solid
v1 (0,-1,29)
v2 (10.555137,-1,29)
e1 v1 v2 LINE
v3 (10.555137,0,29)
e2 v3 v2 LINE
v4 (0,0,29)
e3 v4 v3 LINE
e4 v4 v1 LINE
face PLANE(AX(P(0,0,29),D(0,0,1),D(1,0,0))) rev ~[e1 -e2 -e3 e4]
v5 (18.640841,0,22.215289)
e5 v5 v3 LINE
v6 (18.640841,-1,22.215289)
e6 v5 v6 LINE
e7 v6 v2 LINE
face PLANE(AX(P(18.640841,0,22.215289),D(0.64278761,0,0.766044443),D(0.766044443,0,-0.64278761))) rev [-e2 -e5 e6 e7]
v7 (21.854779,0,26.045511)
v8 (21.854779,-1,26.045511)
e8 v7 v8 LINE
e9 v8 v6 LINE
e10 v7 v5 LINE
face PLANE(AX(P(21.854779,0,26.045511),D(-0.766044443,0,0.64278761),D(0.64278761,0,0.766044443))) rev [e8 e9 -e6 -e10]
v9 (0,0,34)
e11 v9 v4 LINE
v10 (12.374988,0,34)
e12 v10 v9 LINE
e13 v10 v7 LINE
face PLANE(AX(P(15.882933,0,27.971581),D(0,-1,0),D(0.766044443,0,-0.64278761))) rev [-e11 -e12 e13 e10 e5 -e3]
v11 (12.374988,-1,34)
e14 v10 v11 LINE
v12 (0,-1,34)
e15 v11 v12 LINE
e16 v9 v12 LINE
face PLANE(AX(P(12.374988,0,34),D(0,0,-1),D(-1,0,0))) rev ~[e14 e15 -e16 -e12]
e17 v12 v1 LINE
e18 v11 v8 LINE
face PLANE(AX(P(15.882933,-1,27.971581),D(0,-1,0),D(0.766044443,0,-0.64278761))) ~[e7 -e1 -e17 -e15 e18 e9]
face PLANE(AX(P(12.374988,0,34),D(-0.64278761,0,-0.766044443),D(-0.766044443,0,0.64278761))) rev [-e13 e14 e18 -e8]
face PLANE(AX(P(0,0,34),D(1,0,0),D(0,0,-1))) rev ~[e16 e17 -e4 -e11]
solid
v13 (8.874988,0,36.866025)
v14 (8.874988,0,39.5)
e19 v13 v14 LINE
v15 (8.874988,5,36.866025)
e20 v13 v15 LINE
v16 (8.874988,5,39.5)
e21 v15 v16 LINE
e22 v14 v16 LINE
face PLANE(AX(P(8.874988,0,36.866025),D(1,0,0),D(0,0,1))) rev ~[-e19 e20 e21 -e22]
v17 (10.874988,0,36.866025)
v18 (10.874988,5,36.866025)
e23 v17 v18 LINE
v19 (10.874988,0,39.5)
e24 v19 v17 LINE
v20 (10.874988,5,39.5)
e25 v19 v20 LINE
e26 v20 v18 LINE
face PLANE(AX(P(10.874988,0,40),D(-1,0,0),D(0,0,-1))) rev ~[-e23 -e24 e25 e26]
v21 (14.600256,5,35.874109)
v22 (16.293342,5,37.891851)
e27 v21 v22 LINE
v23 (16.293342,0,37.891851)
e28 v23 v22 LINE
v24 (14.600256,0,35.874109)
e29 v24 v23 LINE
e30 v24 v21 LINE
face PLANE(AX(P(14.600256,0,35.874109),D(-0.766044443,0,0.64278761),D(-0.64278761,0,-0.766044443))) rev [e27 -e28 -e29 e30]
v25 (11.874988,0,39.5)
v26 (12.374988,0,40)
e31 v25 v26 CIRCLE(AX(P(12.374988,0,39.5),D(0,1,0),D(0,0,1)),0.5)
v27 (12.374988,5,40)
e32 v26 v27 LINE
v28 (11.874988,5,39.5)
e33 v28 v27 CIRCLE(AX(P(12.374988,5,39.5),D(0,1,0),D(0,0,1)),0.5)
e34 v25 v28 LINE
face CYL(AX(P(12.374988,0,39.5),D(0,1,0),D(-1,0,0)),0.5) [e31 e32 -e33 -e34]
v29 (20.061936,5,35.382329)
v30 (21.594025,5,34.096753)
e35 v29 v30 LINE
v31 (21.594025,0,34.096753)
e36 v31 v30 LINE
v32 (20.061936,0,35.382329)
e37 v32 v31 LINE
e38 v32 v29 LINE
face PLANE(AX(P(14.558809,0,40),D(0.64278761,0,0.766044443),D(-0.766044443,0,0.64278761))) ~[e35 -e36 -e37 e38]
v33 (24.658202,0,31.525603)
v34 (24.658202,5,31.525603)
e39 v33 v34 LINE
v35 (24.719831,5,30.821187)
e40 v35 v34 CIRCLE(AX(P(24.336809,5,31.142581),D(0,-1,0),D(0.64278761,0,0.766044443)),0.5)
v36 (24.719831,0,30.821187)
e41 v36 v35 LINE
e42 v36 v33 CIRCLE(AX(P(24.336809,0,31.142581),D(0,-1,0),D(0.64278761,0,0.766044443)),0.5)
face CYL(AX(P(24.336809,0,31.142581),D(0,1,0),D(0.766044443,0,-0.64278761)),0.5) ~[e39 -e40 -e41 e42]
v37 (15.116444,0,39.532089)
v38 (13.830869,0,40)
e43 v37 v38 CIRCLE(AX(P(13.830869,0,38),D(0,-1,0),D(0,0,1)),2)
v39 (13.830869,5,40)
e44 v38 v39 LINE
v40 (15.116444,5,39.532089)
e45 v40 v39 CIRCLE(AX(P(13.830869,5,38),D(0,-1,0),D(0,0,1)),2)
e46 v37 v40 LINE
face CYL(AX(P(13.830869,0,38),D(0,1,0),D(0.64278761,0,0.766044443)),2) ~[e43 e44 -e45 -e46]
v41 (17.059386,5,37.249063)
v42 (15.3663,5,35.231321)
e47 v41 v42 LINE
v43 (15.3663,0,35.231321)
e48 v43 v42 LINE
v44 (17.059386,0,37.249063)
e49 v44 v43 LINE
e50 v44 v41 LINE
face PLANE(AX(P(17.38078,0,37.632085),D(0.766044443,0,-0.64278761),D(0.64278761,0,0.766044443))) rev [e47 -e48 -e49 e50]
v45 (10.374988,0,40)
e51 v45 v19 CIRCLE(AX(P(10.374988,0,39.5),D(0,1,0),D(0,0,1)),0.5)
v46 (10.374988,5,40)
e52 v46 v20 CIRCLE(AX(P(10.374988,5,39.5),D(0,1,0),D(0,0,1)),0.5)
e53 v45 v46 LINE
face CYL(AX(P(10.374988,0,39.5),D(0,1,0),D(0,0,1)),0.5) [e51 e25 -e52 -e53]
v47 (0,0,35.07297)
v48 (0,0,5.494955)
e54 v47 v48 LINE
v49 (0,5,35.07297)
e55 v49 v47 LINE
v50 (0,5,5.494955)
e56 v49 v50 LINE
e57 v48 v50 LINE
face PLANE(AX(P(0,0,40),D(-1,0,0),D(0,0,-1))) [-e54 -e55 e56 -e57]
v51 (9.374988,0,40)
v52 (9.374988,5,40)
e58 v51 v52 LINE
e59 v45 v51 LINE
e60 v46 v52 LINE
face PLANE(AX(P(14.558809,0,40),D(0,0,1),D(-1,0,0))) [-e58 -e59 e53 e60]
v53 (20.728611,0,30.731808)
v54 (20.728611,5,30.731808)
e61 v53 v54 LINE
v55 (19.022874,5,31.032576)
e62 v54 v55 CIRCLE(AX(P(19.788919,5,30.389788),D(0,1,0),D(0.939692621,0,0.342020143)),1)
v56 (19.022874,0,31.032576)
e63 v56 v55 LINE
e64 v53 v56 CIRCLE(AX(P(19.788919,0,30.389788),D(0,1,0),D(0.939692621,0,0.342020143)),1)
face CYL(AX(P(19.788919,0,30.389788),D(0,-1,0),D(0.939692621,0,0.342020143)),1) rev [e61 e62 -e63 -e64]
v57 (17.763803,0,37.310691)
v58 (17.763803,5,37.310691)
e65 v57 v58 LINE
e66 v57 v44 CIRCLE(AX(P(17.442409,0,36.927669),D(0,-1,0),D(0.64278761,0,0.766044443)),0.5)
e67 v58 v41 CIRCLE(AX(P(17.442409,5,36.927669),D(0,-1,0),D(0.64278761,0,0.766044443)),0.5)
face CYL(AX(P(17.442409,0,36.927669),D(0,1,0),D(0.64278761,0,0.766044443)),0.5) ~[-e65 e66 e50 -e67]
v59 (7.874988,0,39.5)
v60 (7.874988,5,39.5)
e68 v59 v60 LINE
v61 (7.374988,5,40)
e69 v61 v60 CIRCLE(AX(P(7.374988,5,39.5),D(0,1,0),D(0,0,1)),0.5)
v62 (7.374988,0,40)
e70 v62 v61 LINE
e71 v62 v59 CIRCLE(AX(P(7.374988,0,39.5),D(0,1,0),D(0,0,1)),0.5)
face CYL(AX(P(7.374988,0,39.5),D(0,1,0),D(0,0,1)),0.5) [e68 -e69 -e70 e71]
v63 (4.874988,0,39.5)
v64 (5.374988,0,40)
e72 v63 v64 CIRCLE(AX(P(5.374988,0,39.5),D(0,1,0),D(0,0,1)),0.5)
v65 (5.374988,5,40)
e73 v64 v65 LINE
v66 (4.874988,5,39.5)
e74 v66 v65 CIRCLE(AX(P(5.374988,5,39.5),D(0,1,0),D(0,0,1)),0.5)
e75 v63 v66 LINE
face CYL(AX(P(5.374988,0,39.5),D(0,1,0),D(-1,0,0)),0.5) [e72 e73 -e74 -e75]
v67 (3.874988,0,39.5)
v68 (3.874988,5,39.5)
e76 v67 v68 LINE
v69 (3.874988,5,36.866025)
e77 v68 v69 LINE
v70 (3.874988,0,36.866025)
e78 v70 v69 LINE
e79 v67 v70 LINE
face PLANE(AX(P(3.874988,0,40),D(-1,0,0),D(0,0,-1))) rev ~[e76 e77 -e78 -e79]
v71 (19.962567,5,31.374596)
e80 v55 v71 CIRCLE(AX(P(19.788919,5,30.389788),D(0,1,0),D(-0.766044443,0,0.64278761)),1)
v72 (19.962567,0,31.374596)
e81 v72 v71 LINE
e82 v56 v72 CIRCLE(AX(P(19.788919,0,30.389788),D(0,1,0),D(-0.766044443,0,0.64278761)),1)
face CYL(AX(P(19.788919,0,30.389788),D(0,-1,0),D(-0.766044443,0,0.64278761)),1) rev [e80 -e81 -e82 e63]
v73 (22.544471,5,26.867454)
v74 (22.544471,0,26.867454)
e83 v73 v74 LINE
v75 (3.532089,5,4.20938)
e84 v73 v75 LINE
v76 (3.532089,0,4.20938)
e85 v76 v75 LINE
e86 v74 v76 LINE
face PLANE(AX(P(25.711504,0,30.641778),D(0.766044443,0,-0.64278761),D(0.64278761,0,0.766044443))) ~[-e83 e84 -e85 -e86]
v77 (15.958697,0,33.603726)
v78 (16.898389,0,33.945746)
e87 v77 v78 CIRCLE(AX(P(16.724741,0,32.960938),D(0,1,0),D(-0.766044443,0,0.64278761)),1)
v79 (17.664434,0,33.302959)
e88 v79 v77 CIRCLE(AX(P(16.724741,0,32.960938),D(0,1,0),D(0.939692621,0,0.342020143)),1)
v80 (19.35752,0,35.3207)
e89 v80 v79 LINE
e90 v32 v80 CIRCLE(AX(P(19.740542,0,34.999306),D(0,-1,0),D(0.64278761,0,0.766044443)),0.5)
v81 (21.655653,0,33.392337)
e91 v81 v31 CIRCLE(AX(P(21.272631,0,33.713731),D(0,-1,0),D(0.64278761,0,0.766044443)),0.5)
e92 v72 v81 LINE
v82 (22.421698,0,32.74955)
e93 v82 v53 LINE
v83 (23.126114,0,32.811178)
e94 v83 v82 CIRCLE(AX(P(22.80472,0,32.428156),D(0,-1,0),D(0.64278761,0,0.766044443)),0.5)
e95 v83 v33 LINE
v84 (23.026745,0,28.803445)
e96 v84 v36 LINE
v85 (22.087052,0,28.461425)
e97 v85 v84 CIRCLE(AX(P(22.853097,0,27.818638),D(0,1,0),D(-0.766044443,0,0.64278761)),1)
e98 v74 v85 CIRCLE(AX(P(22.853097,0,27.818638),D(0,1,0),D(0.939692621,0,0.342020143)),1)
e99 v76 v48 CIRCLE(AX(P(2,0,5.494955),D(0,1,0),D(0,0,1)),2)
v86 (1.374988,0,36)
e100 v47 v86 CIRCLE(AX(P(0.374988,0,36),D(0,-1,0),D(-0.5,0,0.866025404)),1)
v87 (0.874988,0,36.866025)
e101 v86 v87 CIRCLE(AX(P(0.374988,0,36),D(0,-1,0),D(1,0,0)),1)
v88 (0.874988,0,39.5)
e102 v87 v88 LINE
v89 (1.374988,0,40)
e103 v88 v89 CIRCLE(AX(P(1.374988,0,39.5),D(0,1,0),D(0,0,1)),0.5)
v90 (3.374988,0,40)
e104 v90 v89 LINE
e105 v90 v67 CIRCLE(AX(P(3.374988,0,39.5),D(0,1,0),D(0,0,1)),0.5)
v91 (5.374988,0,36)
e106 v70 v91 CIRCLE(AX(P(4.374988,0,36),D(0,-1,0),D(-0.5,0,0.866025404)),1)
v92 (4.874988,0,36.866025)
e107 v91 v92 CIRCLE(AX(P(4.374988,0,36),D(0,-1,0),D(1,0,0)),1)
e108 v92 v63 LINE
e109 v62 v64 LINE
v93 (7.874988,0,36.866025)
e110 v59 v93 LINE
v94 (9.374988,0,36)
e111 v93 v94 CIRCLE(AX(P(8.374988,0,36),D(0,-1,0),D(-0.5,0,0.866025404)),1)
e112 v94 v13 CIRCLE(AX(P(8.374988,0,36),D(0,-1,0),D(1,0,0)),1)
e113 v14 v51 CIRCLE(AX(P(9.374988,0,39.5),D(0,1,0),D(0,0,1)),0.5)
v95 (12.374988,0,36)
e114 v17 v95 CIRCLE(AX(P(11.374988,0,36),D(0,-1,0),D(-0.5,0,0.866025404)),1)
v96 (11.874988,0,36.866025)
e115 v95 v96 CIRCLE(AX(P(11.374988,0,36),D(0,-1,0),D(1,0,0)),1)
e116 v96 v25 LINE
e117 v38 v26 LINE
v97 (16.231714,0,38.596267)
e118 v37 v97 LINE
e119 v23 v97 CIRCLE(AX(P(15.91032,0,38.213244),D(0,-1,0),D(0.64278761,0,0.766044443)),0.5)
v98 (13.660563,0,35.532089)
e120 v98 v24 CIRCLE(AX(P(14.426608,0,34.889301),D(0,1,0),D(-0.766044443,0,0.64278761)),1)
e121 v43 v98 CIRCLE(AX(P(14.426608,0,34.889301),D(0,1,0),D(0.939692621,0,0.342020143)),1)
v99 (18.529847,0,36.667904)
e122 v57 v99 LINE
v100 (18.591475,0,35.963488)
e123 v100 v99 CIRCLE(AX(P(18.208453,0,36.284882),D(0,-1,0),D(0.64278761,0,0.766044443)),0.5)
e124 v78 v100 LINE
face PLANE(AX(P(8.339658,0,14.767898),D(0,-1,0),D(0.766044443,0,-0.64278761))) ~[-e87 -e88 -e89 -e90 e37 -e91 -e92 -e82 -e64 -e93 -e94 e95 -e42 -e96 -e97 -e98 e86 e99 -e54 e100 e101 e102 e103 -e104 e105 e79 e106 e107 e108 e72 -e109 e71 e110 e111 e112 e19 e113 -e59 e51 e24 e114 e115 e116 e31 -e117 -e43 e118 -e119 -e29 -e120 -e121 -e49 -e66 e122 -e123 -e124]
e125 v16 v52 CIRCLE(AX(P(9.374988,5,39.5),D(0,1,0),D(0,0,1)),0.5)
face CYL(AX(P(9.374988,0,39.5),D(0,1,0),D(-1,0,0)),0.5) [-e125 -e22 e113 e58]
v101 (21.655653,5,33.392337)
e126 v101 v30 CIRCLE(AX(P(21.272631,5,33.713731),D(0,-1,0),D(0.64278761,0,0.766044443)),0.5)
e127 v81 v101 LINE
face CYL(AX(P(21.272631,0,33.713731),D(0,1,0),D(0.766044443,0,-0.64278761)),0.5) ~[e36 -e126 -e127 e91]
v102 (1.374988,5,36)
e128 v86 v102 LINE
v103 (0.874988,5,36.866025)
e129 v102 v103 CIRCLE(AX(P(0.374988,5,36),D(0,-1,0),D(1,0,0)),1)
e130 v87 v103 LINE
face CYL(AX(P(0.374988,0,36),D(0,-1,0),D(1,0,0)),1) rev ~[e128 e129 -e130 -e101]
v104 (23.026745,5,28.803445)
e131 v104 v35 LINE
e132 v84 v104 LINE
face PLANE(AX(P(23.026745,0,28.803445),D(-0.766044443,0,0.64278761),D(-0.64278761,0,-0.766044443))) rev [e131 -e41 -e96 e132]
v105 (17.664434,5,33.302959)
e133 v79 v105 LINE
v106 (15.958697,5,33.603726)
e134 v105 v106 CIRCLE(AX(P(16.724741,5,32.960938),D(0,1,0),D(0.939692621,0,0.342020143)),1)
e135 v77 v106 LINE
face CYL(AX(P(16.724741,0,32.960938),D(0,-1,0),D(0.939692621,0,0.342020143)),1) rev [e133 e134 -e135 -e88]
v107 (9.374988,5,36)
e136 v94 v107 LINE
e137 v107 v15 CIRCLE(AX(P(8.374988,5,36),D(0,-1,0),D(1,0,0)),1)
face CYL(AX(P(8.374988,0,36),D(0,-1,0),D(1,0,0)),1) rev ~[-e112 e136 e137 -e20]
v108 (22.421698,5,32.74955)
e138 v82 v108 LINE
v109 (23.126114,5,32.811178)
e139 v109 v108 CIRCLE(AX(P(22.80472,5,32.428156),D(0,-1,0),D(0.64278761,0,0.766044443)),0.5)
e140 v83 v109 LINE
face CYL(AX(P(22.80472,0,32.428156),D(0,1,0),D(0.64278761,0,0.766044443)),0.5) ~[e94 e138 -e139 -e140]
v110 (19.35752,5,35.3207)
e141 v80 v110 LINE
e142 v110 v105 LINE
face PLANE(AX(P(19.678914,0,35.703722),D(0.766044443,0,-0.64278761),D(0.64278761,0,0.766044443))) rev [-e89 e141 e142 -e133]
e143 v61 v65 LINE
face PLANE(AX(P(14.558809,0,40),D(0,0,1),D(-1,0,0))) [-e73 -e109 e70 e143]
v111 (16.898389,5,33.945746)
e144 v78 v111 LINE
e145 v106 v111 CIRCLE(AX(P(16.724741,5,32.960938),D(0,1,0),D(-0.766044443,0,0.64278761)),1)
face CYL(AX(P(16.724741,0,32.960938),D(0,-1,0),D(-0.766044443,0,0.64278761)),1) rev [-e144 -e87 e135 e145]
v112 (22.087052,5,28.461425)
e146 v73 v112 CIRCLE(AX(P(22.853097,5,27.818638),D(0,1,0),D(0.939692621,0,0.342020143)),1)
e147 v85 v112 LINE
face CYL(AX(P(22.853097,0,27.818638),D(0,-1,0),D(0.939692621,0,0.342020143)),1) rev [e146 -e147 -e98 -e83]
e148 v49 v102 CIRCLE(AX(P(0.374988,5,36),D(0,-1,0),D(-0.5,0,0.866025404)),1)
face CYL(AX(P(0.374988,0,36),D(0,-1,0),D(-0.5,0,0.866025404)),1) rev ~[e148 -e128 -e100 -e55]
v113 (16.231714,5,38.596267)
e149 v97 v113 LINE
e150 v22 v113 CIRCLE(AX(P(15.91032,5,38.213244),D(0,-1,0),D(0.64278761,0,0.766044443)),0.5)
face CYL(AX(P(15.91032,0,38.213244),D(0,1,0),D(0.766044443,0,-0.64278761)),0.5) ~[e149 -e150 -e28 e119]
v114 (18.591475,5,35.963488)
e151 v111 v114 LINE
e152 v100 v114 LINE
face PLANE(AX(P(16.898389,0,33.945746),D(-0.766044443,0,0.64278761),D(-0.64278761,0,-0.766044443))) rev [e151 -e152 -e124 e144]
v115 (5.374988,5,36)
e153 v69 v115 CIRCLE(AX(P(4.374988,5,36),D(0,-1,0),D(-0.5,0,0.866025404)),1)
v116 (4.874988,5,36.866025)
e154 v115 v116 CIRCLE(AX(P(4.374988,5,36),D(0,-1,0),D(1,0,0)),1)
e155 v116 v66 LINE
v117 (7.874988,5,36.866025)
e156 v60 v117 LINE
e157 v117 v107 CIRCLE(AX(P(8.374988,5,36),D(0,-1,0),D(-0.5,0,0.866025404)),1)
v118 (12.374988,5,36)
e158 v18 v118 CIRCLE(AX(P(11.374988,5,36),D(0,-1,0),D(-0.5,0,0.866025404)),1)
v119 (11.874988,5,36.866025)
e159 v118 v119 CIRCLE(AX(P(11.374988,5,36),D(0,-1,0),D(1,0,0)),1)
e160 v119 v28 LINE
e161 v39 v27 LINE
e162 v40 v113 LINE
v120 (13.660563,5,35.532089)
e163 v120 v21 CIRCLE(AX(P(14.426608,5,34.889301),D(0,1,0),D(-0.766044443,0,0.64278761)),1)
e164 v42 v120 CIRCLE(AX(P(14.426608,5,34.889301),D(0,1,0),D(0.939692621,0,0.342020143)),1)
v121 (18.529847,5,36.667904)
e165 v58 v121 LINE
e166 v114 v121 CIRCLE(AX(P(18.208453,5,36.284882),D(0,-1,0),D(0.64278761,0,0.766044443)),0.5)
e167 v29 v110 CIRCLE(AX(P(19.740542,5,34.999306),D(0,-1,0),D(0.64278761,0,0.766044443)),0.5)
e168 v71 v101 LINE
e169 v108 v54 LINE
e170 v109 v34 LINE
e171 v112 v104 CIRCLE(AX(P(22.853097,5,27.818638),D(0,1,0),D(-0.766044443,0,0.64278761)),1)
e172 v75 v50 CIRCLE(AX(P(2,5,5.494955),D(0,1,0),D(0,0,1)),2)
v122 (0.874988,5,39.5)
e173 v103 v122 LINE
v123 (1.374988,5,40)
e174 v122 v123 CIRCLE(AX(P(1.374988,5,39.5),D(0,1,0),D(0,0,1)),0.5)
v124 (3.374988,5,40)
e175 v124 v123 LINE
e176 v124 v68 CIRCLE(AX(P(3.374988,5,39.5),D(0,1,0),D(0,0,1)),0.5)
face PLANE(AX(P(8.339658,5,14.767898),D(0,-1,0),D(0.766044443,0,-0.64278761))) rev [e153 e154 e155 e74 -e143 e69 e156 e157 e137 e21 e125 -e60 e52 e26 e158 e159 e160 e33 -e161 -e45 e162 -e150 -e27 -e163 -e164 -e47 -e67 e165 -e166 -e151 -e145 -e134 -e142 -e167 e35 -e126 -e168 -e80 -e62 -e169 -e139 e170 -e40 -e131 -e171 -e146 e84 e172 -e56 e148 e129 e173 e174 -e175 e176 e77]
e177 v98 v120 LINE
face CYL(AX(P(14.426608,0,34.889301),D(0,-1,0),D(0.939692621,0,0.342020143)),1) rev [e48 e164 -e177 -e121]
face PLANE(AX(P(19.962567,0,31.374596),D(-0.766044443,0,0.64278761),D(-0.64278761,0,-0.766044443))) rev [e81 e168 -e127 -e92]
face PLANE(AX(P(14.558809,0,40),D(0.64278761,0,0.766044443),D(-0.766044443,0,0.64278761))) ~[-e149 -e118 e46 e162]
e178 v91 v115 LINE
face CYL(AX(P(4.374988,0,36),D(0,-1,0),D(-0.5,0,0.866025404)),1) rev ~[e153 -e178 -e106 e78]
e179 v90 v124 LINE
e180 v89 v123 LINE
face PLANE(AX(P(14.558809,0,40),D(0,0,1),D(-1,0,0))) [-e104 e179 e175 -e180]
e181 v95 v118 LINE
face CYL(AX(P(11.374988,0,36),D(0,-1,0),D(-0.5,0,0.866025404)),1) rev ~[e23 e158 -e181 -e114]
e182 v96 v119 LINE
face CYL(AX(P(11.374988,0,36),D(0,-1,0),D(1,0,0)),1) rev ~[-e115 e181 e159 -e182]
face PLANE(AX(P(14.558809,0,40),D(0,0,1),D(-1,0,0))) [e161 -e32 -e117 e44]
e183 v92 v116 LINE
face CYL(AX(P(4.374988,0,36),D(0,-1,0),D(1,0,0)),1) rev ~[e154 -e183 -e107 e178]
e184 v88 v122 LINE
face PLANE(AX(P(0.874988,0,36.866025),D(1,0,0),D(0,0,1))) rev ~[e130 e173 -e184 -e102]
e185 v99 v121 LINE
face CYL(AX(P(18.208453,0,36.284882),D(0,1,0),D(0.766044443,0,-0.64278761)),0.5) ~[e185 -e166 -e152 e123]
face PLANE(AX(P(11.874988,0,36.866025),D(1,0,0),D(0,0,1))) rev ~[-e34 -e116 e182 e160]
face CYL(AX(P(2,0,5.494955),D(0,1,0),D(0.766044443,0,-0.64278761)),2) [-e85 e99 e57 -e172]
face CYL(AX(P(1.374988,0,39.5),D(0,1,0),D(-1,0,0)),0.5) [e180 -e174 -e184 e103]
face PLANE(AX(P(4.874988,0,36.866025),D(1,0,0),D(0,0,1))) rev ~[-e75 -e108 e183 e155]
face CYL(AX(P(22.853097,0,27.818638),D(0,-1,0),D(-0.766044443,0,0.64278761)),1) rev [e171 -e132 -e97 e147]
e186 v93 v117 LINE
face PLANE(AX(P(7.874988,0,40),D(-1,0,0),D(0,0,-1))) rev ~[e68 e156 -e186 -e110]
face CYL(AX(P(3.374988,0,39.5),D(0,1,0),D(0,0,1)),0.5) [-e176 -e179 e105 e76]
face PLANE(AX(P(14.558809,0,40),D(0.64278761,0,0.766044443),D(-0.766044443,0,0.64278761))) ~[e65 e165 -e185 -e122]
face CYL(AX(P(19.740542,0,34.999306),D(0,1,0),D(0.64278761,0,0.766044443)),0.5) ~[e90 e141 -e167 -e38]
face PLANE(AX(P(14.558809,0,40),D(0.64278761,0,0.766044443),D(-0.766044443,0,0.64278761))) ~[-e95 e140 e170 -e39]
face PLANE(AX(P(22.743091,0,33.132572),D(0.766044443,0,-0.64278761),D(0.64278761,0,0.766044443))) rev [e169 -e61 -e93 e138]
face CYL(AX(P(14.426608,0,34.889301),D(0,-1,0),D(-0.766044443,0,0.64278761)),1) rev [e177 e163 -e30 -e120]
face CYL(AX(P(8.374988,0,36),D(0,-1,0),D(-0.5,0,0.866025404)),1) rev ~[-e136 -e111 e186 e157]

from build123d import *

# Parameters (mm, degrees)
F2_DEPTH = 5
F3_DEPTH = 1
F4_DEPTH = 5
F5_R     = 0.5
F8_R     = 2


with BuildPart() as f2:
    # F0 (on Front) → F2 (new body)
    with BuildSketch(Plane.XZ):
        Polygon((0, 29), (0, 0), (10.5551367937, 29), align=None)
        Polygon((0, 34), (0, 29), (10.5551367937, 29), (12.3749879651, 34), align=None)
        Polygon((12.3749879651, 34), (14.5588093706, 40), (0, 40), (0, 34), align=None)
    extrude(amount=-F2_DEPTH)

    # F1 (on Front) → F4 (cut, through all)
    with BuildSketch(Plane.XZ):
        with BuildLine():
            ThreePointArc((-0.1250120349, 36.8660254038), (-0.1250120349, 35.1339745962), (1.3749879651, 36))
            ThreePointArc((1.3749879651, 36), (1.2410133688, 36.5), (0.8749879651, 36.8660254038))
            ThreePointArc((0.8749879651, 36.8660254038), (0.3749879651, 37), (-0.1250120349, 36.8660254038))
        make_face()
        with BuildLine():
            ThreePointArc((-0.1250120349, 36.8660254038), (0.3749879651, 37), (0.8749879651, 36.8660254038))
            Line((0.8749879651, 36.8660254038), (0.8749879651, 40))
            Line((0.8749879651, 40), (-0.1250120349, 40))
            Line((-0.1250120349, 40), (-0.1250120349, 36.8660254038))
        make_face()
        with BuildLine():
            ThreePointArc((3.8749879651, 36.8660254038), (3.8749879651, 35.1339745962), (5.3749879651, 36))
            ThreePointArc((5.3749879651, 36), (5.2410133688, 36.5), (4.8749879651, 36.8660254038))
            ThreePointArc((4.8749879651, 36.8660254038), (4.3749879651, 37), (3.8749879651, 36.8660254038))
        make_face()
        with BuildLine():
            ThreePointArc((3.8749879651, 36.8660254038), (4.3749879651, 37), (4.8749879651, 36.8660254038))
            Line((4.8749879651, 36.8660254038), (4.8749879651, 40))
            Line((4.8749879651, 40), (3.8749879651, 40))
            Line((3.8749879651, 40), (3.8749879651, 36.8660254038))
        make_face()
        with BuildLine():
            ThreePointArc((10.8749879651, 36.8660254038), (10.8749879651, 35.1339745962), (12.3749879651, 36))
            ThreePointArc((12.3749879651, 36), (12.2410133688, 36.5), (11.8749879651, 36.8660254038))
            ThreePointArc((11.8749879651, 36.8660254038), (11.3749879651, 37), (10.8749879651, 36.8660254038))
        make_face()
        with BuildLine():
            ThreePointArc((7.8749879651, 36.8660254038), (7.8749879651, 35.1339745962), (9.3749879651, 36))
            ThreePointArc((9.3749879651, 36), (9.2410133688, 36.5), (8.8749879651, 36.8660254038))
            ThreePointArc((8.8749879651, 36.8660254038), (8.3749879651, 37), (7.8749879651, 36.8660254038))
        make_face()
        with BuildLine():
            ThreePointArc((7.8749879651, 36.8660254038), (8.3749879651, 37), (8.8749879651, 36.8660254038))
            Line((8.8749879651, 36.8660254038), (8.8749879651, 40))
            Line((8.8749879651, 40), (7.8749879651, 40))
            Line((7.8749879651, 40), (7.8749879651, 36.8660254038))
        make_face()
        with BuildLine():
            ThreePointArc((10.8749879651, 36.8660254038), (11.3749879651, 37), (11.8749879651, 36.8660254038))
            Line((11.8749879651, 36.8660254038), (11.8749879651, 40))
            Line((11.8749879651, 40), (10.8749879651, 40))
            Line((10.8749879651, 40), (10.8749879651, 36.8660254038))
        make_face()
    extrude(amount=-F4_DEPTH, mode=Mode.SUBTRACT)

    # F5
    f5_edges = [f2.edges().sort_by_distance(p)[0] for p in [
        (0.874988, 2.5, 40),
        (3.874988, 2.5, 40),
        (4.874988, 2.5, 40),
        (11.874988, 2.5, 40),
        (10.874988, 2.5, 40),
        (7.874988, 2.5, 40),
        (8.874988, 2.5, 40),
    ]]
    fillet(f5_edges, radius=F5_R)

    # F6: F2 across face


with BuildPart() as f3:
    # F0 (on Front) → F3 (new body)
    with BuildSketch(Plane.XZ):
        Polygon((0, 34), (0, 29), (10.5551367937, 29), (12.3749879651, 34), align=None)
    extrude(amount=F3_DEPTH)

    # F7: F3 across face


with BuildPart() as f2_1:
    add(f2.part)
    add(f2.part.mirror(Plane(origin=(7.2794046853, 2.5, 20), x_dir=(0, 1, 0), z_dir=(0.9396926208, 0, -0.3420201433))))

    # F8
    f8_edges = [f2_1.edges().sort_by_distance(p)[0] for p in [
        (14.558809, 2.5, 40),
        (0, 2.5, 0),
    ]]
    fillet(f8_edges, radius=F8_R)


with BuildPart() as f3_1:
    add(f3.part)
    add(f3.part.mirror(Plane(origin=(11.4650623794, -0.5, 31.5), x_dir=(0, 1, 0), z_dir=(0.9396926208, 0, -0.3420201433))))


solid = Compound([f2_1.part, f3_1.part])
